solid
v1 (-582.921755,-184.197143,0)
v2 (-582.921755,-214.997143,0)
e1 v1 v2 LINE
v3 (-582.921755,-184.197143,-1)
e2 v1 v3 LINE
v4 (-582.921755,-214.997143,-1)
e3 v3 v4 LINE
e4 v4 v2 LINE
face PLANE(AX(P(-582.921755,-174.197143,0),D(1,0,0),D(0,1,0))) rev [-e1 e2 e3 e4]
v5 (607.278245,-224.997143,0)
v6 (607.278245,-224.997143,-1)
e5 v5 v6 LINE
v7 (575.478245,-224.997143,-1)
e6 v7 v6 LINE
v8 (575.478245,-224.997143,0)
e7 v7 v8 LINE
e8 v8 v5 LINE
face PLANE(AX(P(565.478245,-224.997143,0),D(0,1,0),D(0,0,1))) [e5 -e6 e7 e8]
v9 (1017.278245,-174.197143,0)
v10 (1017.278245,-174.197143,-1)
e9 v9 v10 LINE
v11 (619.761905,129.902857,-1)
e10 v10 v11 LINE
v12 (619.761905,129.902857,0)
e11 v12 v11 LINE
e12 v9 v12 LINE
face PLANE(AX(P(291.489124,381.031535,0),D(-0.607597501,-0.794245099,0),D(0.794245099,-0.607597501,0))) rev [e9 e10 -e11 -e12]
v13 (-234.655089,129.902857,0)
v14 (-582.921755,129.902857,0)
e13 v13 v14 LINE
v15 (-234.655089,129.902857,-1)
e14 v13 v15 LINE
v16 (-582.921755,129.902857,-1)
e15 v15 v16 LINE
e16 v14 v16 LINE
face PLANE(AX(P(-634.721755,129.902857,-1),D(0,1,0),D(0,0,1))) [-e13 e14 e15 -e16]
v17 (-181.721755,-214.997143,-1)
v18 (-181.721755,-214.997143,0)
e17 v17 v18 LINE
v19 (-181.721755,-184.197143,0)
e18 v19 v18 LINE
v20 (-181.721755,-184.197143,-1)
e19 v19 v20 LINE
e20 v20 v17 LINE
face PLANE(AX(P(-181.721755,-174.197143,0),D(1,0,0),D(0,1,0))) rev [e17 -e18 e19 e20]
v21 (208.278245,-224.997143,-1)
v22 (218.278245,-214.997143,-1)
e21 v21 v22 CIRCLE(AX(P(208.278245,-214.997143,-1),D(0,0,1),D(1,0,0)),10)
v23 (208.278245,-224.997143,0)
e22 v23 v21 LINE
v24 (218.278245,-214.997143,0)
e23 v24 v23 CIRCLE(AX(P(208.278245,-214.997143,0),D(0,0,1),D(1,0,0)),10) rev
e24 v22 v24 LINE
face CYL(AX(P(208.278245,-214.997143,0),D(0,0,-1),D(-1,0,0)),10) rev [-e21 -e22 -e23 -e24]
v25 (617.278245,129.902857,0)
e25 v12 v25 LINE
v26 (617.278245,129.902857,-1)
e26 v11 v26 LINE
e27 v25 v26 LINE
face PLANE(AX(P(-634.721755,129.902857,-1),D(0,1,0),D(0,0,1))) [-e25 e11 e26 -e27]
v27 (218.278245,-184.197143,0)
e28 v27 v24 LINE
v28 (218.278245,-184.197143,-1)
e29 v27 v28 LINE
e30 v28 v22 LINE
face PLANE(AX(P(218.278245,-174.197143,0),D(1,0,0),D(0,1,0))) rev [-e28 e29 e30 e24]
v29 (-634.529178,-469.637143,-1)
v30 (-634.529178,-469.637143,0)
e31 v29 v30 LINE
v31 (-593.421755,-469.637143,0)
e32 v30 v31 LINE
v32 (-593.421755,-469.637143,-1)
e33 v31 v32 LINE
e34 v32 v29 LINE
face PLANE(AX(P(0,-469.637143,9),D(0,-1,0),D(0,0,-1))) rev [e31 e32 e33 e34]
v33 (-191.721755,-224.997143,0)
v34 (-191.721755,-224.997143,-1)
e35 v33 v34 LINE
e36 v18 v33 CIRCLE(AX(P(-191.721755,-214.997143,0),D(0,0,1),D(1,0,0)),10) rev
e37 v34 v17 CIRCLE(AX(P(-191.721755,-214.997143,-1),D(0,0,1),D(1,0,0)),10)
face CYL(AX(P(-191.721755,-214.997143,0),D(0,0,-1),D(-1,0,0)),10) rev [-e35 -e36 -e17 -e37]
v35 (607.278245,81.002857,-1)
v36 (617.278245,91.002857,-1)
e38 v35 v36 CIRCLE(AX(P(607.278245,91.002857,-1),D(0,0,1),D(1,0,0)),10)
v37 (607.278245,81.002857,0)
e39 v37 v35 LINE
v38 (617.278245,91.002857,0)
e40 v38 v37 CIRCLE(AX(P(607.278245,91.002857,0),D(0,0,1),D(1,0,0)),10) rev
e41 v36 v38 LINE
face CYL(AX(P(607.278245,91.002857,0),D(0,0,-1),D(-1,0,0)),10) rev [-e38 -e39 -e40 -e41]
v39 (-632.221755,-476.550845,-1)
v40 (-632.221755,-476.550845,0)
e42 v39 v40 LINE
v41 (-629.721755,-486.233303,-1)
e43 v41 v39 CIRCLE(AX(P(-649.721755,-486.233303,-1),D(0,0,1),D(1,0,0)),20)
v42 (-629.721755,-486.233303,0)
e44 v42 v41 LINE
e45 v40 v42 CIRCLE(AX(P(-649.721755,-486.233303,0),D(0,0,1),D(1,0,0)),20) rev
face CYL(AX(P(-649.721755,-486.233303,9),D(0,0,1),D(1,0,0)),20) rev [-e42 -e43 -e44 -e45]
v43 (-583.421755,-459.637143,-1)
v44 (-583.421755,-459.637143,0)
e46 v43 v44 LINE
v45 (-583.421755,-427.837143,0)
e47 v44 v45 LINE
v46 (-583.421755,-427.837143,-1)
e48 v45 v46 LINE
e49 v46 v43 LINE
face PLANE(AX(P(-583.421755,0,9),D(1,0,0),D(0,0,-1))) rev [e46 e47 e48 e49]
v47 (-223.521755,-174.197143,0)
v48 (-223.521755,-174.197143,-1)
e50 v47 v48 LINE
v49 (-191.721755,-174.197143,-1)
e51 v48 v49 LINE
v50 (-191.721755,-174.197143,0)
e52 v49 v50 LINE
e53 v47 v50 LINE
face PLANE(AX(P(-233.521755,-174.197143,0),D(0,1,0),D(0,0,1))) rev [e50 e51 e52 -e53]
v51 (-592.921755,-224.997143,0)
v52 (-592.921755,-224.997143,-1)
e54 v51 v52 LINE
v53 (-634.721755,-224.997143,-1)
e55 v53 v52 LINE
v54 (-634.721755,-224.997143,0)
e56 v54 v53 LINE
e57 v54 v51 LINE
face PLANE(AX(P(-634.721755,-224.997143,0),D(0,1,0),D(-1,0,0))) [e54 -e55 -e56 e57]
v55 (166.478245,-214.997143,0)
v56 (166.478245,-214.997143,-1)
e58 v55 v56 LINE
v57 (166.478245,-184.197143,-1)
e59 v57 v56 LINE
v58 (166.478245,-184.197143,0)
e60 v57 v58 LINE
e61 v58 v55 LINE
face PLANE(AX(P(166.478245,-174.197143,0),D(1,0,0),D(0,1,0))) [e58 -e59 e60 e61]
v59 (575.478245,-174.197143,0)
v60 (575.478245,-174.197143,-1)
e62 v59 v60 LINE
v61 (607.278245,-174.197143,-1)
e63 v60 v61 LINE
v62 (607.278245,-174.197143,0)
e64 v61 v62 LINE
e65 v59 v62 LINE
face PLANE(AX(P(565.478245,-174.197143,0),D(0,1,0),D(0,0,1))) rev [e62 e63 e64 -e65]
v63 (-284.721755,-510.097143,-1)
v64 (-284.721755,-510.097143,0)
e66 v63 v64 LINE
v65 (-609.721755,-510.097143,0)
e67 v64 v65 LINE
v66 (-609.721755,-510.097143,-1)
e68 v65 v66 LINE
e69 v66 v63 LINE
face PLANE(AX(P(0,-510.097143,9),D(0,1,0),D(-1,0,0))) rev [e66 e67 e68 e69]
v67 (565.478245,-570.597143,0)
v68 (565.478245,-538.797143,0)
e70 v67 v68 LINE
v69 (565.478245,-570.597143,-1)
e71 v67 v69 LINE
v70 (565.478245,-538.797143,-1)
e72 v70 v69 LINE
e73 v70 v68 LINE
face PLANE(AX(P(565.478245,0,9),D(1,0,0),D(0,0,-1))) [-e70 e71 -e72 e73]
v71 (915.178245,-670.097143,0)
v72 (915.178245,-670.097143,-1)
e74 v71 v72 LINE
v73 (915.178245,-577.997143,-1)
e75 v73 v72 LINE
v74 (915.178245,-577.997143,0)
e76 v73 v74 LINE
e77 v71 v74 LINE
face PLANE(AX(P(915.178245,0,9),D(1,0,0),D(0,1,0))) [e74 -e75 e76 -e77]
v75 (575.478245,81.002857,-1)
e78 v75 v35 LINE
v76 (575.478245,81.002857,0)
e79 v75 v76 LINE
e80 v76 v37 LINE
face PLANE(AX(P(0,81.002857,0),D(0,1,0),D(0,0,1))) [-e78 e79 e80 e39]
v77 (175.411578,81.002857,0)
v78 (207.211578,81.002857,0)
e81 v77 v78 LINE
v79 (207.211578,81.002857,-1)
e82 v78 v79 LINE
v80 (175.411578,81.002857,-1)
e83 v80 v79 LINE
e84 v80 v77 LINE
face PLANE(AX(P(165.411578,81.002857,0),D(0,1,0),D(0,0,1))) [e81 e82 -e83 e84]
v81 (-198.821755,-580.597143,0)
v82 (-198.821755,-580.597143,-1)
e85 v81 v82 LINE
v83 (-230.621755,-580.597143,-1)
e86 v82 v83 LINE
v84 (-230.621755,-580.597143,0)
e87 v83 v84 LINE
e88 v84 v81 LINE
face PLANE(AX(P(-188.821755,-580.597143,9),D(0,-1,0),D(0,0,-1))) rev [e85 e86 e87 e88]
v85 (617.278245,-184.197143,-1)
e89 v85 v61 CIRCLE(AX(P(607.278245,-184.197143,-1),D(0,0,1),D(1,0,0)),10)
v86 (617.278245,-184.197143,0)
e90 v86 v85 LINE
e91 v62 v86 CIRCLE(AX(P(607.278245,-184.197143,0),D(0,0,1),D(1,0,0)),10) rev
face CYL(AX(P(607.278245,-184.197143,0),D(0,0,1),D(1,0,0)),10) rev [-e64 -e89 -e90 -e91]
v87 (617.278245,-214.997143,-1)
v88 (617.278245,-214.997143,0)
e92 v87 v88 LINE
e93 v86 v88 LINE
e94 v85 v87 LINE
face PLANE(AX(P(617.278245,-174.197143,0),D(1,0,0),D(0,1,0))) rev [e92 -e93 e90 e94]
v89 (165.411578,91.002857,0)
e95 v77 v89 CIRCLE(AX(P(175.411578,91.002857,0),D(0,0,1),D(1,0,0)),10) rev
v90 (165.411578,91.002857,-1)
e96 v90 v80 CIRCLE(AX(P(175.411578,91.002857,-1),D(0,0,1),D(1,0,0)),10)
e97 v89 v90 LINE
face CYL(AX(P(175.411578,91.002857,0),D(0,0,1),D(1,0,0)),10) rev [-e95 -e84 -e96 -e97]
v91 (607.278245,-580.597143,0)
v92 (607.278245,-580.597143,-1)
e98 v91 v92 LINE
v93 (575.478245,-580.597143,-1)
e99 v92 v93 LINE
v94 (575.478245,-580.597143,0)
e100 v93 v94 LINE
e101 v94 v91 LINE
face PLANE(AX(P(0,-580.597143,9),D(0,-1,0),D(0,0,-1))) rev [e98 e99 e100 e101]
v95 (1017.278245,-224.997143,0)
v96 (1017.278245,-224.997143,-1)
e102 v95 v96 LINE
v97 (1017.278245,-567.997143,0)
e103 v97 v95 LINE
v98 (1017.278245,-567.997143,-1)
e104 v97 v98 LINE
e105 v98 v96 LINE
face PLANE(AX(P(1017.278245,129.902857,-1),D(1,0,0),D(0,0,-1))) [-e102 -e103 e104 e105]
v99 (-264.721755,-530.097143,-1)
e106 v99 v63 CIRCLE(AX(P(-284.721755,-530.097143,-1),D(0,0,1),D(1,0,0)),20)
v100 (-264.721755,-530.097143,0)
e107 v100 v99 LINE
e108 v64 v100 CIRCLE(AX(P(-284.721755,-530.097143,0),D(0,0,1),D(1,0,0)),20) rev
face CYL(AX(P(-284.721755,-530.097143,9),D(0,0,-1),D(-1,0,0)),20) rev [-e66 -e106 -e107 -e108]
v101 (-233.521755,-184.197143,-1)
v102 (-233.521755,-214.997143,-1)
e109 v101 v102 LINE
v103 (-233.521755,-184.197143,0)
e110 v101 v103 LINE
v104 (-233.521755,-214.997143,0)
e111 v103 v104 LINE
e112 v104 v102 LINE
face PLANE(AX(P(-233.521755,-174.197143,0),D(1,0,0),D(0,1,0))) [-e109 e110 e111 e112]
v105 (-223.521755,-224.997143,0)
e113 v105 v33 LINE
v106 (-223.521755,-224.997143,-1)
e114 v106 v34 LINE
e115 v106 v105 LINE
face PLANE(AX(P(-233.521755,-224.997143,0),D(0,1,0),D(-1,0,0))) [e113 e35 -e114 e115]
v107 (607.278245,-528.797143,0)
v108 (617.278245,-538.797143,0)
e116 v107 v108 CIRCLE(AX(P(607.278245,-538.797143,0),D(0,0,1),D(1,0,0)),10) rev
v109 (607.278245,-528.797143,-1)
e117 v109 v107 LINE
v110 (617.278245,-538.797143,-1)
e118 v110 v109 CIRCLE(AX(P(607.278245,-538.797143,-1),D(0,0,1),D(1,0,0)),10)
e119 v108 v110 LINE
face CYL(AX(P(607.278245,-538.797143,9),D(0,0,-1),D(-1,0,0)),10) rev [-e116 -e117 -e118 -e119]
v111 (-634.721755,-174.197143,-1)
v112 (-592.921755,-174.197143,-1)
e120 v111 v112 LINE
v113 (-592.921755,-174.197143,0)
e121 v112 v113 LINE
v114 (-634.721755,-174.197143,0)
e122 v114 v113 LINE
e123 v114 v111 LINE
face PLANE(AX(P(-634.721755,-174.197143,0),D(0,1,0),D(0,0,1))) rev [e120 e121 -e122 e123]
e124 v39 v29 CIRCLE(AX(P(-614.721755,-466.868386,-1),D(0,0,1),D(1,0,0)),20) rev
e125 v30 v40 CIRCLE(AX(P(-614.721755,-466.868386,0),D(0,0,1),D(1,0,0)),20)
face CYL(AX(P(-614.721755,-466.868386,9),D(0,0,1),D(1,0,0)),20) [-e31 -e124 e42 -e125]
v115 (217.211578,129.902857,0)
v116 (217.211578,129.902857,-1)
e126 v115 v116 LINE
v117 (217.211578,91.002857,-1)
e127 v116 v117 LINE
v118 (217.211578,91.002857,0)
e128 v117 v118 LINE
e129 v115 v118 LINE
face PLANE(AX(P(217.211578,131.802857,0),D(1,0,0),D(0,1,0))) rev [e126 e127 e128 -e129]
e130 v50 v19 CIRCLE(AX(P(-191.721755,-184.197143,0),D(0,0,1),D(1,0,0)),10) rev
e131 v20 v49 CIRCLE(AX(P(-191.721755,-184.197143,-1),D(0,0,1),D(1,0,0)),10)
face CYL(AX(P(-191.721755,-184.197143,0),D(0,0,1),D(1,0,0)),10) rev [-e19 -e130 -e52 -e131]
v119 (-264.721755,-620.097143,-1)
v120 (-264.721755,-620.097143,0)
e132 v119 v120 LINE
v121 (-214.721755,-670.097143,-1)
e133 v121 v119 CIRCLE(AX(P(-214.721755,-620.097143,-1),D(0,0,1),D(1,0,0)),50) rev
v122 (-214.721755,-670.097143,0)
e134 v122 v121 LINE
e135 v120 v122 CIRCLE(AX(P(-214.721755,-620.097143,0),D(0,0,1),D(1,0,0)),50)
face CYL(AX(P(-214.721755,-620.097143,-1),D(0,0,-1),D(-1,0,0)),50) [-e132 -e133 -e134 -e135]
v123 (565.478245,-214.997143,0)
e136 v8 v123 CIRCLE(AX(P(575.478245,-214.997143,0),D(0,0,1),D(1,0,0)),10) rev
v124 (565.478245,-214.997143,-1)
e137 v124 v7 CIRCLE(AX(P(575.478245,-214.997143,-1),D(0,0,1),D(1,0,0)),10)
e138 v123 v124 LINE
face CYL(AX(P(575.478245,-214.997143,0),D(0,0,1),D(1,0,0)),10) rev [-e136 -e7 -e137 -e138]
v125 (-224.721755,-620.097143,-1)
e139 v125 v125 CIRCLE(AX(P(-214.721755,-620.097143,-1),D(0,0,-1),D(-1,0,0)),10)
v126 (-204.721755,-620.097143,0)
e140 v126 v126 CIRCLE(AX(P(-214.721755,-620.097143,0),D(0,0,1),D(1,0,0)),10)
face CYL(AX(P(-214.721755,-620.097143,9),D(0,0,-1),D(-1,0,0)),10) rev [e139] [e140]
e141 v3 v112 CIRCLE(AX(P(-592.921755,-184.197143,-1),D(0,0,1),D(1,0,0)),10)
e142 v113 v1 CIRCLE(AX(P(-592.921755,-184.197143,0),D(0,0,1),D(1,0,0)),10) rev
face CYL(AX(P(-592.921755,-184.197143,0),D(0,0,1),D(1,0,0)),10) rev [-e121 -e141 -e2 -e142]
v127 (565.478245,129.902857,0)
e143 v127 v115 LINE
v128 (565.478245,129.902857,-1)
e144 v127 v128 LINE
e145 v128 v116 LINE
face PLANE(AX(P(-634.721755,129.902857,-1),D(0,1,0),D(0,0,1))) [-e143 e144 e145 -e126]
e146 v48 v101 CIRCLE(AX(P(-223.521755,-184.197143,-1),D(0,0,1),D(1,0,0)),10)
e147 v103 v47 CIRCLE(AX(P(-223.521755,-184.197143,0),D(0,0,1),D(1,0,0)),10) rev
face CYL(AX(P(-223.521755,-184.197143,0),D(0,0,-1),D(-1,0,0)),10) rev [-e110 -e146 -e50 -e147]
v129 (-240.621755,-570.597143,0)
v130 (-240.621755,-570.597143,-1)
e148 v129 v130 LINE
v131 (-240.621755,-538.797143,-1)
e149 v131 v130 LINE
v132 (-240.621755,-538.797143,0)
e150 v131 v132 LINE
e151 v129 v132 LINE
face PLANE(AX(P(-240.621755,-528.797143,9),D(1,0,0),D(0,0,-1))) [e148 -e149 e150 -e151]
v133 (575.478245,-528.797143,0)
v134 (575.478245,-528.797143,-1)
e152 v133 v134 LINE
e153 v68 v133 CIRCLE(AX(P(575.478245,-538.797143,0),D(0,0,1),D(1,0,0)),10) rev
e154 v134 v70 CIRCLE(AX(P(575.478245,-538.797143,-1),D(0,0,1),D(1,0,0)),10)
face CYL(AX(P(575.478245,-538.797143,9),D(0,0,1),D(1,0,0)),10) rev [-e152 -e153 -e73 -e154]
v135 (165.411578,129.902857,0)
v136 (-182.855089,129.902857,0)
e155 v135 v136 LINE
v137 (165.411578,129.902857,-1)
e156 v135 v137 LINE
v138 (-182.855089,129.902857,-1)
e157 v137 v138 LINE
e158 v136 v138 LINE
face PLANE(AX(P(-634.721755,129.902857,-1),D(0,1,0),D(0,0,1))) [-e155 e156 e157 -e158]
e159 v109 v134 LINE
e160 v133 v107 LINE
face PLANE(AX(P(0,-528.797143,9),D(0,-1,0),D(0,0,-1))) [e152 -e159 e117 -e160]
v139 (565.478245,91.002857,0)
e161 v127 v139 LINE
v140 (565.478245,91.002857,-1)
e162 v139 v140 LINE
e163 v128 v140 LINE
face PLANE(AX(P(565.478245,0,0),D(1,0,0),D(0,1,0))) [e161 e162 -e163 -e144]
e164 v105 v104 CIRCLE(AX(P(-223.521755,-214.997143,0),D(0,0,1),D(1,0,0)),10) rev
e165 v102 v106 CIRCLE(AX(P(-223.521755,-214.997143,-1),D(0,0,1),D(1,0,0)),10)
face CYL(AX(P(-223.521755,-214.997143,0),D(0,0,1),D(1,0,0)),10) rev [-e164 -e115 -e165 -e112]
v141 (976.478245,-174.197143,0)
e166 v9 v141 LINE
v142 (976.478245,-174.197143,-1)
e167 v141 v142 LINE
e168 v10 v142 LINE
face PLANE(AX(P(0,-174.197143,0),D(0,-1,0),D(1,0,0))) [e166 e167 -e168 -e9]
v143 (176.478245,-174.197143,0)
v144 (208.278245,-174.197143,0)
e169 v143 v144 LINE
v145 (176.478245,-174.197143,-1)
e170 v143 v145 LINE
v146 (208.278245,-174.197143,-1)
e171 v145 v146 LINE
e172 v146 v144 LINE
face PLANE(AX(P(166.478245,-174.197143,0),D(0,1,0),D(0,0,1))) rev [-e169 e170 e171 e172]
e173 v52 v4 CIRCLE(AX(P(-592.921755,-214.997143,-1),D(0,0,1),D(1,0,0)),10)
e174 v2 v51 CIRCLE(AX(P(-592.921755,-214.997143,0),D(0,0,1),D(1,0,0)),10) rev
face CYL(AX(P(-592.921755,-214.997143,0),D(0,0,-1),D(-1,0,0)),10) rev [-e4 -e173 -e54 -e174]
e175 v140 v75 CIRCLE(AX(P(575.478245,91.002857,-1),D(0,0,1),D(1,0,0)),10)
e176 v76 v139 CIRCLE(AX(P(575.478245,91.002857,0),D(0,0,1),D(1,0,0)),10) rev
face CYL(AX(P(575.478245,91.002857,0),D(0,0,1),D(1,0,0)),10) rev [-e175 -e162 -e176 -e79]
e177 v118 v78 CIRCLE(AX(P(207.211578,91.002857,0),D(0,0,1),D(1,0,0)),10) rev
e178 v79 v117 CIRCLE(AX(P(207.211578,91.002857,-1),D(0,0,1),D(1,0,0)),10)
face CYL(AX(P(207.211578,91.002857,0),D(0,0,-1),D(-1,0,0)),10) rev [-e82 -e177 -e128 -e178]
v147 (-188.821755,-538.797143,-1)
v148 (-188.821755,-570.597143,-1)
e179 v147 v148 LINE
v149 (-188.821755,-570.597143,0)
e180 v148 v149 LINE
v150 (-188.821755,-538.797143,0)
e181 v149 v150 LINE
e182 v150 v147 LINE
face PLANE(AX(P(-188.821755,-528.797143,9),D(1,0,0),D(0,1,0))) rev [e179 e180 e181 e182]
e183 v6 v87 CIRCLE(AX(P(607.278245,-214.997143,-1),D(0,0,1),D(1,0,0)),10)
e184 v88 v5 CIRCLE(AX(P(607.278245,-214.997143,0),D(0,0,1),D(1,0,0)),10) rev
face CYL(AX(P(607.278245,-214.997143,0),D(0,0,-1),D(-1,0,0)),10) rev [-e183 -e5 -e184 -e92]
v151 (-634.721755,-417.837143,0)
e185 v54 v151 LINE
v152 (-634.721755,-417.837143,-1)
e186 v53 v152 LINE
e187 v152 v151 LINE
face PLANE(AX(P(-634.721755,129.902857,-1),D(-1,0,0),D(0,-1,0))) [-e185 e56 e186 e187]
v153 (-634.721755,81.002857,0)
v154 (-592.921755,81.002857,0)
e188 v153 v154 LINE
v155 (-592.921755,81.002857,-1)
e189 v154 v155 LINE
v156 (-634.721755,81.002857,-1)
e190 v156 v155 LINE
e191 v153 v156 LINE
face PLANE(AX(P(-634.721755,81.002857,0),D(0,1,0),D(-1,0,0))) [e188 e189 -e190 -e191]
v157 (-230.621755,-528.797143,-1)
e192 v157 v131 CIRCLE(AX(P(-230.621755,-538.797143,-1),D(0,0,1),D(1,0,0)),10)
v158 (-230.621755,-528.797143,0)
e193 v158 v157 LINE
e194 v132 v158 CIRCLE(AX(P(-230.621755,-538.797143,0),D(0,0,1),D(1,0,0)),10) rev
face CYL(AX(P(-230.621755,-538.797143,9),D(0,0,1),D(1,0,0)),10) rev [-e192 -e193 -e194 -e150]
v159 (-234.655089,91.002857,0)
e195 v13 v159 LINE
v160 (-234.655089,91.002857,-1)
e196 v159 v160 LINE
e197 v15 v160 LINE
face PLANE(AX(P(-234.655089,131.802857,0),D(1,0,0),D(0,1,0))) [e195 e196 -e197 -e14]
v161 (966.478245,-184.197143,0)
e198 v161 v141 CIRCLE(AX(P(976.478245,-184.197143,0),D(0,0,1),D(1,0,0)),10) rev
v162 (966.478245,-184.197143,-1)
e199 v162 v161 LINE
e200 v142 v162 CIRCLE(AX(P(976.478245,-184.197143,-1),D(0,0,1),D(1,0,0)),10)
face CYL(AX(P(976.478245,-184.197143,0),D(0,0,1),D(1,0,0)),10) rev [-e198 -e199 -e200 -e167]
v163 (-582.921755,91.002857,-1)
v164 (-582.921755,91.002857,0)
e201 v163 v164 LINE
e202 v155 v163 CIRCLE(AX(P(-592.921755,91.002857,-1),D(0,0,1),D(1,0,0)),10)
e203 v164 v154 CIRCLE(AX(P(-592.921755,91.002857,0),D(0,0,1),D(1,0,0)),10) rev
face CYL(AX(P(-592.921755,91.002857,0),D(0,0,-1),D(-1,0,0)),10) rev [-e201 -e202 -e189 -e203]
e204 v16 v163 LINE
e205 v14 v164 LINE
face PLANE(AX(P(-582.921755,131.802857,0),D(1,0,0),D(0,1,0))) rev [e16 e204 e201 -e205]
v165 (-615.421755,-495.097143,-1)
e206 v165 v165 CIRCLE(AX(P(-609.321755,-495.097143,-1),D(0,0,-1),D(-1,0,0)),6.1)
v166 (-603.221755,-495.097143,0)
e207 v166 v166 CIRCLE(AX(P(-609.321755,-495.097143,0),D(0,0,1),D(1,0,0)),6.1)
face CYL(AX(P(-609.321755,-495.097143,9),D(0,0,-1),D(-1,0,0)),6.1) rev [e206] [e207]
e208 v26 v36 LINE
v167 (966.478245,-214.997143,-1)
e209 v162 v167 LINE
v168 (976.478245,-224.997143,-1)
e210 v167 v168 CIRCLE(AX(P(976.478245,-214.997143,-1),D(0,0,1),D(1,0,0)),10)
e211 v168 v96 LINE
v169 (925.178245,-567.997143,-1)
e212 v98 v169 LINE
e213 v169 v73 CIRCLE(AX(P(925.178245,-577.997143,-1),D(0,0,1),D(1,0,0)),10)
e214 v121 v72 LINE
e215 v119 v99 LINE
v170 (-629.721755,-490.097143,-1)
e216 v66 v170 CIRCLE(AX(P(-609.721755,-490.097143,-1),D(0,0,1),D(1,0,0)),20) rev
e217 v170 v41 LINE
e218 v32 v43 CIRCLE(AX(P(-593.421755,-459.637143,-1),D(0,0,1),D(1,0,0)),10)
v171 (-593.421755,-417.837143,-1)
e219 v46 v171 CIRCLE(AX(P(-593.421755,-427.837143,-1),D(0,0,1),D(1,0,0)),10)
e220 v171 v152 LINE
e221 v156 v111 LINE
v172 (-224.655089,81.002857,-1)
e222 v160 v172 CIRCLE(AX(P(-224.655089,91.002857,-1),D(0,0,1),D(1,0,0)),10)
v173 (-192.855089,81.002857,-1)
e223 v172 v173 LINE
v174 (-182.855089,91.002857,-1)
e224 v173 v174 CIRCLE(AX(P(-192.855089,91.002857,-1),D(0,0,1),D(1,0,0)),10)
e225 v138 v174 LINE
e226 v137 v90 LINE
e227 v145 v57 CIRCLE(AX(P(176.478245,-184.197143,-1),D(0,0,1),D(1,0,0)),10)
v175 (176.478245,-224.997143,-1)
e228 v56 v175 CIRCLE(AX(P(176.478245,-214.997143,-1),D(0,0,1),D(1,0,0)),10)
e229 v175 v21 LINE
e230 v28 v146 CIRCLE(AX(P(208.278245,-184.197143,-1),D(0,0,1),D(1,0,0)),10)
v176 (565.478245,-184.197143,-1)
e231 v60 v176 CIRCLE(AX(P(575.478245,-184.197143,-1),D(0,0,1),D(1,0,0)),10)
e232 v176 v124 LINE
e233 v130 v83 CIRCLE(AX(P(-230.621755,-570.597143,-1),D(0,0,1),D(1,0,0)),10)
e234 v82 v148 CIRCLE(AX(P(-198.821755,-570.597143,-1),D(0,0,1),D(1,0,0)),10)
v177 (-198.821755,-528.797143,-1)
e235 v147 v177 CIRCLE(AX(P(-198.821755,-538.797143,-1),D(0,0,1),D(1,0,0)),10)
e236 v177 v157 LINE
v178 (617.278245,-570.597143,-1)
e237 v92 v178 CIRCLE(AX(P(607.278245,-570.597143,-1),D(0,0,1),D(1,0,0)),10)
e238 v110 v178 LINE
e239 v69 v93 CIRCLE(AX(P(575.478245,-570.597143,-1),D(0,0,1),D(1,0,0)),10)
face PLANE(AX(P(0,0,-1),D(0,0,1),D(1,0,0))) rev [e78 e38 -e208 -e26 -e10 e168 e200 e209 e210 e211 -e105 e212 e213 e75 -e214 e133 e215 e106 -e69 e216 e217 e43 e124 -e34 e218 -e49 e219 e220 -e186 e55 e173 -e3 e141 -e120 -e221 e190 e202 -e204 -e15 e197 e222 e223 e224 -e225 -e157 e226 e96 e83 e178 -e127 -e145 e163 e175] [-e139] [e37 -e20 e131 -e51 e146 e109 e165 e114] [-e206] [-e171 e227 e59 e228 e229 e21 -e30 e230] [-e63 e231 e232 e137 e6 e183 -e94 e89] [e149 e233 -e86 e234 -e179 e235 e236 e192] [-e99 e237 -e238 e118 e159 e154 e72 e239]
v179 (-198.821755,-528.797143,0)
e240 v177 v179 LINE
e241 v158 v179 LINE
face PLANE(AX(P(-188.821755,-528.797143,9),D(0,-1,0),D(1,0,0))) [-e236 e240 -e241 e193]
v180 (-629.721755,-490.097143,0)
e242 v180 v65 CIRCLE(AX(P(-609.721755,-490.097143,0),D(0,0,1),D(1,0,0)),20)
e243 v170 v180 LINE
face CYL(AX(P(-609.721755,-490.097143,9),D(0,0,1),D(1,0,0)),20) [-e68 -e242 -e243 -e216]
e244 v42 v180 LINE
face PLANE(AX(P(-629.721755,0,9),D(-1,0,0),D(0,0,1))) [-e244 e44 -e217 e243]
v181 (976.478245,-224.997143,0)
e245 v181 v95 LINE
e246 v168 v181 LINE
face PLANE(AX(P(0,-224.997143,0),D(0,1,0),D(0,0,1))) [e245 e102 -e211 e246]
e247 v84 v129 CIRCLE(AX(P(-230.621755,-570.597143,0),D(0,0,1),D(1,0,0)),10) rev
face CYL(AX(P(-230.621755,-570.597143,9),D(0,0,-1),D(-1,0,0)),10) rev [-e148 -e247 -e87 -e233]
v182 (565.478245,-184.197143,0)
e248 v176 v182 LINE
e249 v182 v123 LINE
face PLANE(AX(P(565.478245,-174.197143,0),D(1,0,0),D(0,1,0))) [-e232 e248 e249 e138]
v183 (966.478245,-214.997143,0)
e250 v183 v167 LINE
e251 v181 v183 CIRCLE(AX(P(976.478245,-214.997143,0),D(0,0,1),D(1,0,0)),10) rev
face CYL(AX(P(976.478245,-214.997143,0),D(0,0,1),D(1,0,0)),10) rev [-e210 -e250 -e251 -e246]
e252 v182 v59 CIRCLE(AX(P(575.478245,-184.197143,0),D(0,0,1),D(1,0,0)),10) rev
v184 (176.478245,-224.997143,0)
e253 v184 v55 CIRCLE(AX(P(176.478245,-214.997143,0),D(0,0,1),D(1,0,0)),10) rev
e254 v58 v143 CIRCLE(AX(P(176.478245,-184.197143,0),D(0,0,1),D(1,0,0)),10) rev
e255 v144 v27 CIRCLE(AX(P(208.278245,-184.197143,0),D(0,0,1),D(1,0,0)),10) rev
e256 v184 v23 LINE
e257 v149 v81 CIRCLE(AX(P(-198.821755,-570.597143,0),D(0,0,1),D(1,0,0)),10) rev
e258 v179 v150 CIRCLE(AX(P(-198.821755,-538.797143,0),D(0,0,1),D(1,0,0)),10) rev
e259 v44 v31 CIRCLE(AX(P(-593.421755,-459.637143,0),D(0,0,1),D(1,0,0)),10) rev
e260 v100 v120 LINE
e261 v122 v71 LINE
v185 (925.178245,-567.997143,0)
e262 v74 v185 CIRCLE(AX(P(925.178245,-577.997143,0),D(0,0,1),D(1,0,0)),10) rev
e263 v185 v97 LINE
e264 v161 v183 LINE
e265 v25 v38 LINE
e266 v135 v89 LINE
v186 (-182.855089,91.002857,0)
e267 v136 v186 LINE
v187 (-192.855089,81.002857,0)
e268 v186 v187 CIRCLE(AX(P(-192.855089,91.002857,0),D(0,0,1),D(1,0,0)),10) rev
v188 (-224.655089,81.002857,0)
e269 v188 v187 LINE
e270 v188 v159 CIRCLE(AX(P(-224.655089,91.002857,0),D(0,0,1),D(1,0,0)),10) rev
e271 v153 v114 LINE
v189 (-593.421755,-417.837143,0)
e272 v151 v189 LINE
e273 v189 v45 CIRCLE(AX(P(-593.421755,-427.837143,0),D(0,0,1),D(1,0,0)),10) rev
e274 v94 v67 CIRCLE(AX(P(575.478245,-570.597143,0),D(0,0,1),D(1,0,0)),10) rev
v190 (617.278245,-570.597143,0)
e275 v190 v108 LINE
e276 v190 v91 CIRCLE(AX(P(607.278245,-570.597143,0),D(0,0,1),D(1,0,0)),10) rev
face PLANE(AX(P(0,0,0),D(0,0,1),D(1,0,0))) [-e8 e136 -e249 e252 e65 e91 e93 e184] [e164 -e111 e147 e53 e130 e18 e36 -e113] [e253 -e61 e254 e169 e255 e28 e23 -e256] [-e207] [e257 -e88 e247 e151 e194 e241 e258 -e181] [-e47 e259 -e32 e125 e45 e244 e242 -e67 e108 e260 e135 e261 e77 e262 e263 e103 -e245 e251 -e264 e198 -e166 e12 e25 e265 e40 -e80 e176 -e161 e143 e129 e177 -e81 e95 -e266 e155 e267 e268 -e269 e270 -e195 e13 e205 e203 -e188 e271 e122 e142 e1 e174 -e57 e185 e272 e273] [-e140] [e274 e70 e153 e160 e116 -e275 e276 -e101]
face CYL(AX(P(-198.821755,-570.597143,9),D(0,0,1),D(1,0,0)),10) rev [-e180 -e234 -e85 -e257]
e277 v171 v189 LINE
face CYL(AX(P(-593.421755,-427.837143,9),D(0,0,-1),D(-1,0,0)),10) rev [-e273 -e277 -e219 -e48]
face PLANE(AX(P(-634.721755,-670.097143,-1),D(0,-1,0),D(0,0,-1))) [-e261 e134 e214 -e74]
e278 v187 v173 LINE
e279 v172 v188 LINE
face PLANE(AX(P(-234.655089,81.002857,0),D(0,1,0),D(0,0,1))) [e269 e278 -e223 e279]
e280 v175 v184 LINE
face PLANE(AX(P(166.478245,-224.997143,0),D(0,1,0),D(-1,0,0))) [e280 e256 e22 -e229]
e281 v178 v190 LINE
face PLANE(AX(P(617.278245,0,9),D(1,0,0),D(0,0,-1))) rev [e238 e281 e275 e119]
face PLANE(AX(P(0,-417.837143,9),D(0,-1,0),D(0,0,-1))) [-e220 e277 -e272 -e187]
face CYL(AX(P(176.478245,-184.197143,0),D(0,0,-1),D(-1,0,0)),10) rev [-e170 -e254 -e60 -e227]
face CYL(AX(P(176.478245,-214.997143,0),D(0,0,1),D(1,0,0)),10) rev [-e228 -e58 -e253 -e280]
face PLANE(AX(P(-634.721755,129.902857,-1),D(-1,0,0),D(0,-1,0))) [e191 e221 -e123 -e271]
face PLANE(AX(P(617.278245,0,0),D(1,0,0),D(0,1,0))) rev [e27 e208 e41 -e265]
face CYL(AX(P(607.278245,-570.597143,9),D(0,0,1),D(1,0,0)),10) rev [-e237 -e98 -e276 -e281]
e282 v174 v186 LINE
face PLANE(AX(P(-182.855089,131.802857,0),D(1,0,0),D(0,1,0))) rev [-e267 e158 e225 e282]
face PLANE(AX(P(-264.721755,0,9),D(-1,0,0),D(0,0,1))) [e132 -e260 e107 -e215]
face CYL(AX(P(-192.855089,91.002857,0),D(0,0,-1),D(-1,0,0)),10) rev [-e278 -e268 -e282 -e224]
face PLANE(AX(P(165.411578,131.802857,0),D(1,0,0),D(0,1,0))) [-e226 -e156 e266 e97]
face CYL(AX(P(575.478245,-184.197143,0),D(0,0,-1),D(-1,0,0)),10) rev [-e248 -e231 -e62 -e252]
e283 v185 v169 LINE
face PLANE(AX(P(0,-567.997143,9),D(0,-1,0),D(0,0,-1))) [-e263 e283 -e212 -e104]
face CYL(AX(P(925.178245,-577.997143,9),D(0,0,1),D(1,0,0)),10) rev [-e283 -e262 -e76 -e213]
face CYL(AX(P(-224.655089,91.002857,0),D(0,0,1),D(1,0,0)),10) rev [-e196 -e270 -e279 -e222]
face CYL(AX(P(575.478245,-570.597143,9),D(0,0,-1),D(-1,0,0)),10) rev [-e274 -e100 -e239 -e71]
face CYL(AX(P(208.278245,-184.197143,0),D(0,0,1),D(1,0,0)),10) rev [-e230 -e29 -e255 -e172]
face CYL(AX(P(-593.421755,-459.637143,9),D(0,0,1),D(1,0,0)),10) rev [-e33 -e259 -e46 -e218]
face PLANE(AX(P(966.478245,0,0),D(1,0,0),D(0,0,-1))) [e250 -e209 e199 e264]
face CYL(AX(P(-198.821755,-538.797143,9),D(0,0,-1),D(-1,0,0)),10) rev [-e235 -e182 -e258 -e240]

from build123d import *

# Parameters (mm, degrees)
CROQUIS1_W            = 1652
CROQUIS1_H            = 800
BRIDA_BASE1_DEPTH     = 1
CROQUIS14_W           = 51.8
CROQUIS14_H           = 50.8
CROQUIS14_W_2         = 50.8
CORTAR_EXTRUIR1_DEPTH = 1219.148680595
REDONDEO1_R           = 10
REDONDEO2_R           = 10
CROQUIS17_W           = 370
CROQUIS17_H           = 160
CROQUIS17_W_2         = 5
CROQUIS17_H_2         = 30
CROQUIS17_R           = 6.1
CORTAR_EXTRUIR2_DEPTH = 10
REDONDEO3_R           = 50
REDONDEO4_R           = 20
CROQUIS18_R           = 10
CROQUIS18_W           = 51.8
CROQUIS18_H           = 51.8
CROQUIS18_W_2         = 102.1
CROQUIS18_H_2         = 102.1
CORTAR_EXTRUIR3_DEPTH = 10
REDONDEO5_R           = 10
REDONDEO6_R           = 20
REDONDEO7_R           = 10


# Sheet-metal steps are written as plain solids
with BuildPart() as part:
    # Brida base1: sheet metal written as solids
    # Croquis1 → Brida base1 (new body)
    with BuildSketch(Plane.XY):
        with Locations((191.278244715, -270.097142857)):
            Rectangle(CROQUIS1_W, CROQUIS1_H)
    extrude(amount=-BRIDA_BASE1_DEPTH)

    # Croquis14 → Cortar-Extruir1 (cut, through all)
    with BuildSketch(Plane.XY.offset(-1)):
        with Locations((-608.821755285, -199.597142857)):
            Rectangle(CROQUIS14_W, CROQUIS14_H)
        with Locations((991.878244715, -199.597142857)):
            Rectangle(CROQUIS14_W_2, CROQUIS14_H)
        with Locations((591.378244715, -199.597142857)):
            Rectangle(CROQUIS14_W, CROQUIS14_H)
        Polygon((617.278244715, 81.002857143), (617.278244715, 131.802857143), (565.478244715, 131.802857143), (565.478244715, 81.002857143), (591.378244715, 81.002857143), align=None)
        Polygon((617.278244715, 131.802857143), (1017.278244715, -174.197142857), (1017.278244715, 131.802857143), align=None)
        with Locations((-207.621755285, -199.597142857)):
            Rectangle(CROQUIS14_W, CROQUIS14_H)
        with Locations((192.378244715, -199.597142857)):
            Rectangle(CROQUIS14_W, CROQUIS14_H)
        with Locations((191.311578048, 106.402857143)):
            Rectangle(CROQUIS14_W, CROQUIS14_H)
        with Locations((-208.755088618, 106.402857143)):
            Rectangle(CROQUIS14_W, CROQUIS14_H)
        with Locations((-608.821755285, 106.402857143)):
            Rectangle(CROQUIS14_W, CROQUIS14_H)
    extrude(amount=CORTAR_EXTRUIR1_DEPTH, mode=Mode.SUBTRACT)

    # Redondeo1
    redondeo1_edges = [part.edges().sort_by_distance(p)[0] for p in [
        (617.278244715, -224.997142857, -0.5),
    ]]
    fillet(redondeo1_edges, radius=REDONDEO1_R)

    # Redondeo2
    redondeo2_edges = [part.edges().sort_by_distance(p)[0] for p in [
        (-582.921755285, -174.197142857, -0.5),
        (-582.921755285, -224.997142857, -0.5),
        (-181.721755285, -174.197142857, -0.5),
        (-233.521755285, -174.197142857, -0.5),
        (-233.521755285, -224.997142857, -0.5),
        (-181.721755285, -224.997142857, -0.5),
        (166.478244715, -174.197142857, -0.5),
        (166.478244715, -224.997142857, -0.5),
        (218.278244715, -224.997142857, -0.5),
        (218.278244715, -174.197142857, -0.5),
        (617.278244715, -174.197142857, -0.5),
        (565.478244715, -174.197142857, -0.5),
        (565.478244715, -224.997142857, -0.5),
        (966.478244715, -224.997142857, -0.5),
        (966.478244715, -174.197142857, -0.5),
        (565.478244715, 81.002857143, -0.5),
        (617.278244715, 81.002857143, -0.5),
        (-582.921755285, 81.002857143, -0.5),
        (-234.655088618, 81.002857143, -0.5),
        (-182.855088618, 81.002857143, -0.5),
        (165.411578048, 81.002857143, -0.5),
        (217.211578048, 81.002857143, -0.5),
    ]]
    fillet(redondeo2_edges, radius=REDONDEO2_R)

    # Croquis17 → Cortar-Extruir2 (cut)
    with BuildSketch(Plane(origin=(0, 0, -1), x_dir=(-1, 0, 0), z_dir=(0, 0, -1))):
        with Locations((449.721755285, -590.097142857)):
            Rectangle(CROQUIS17_W, CROQUIS17_H)
        with Locations((632.221755285, -495.097142857)):
            Rectangle(CROQUIS17_W_2, CROQUIS17_H_2)
        with Locations((609.321755285, -495.097142857)):
            Circle(CROQUIS17_R)
    extrude(amount=-CORTAR_EXTRUIR2_DEPTH, mode=Mode.SUBTRACT)

    # Redondeo3
    redondeo3_edges = [part.edges().sort_by_distance(p)[0] for p in [
        (-264.721755285, -670.097142857, -0.5),
        (1017.278244715, -670.097142857, -0.5),
    ]]
    fillet(redondeo3_edges, radius=REDONDEO3_R)

    # Redondeo4
    # the kernel refuses this fillet: 20 mm, written as the material it adds along each edge
    with BuildSketch(Plane(origin=(-264.721755285, -510.097142857, -1), x_dir=(0, -1, 0), z_dir=(0, 0, 1))) as redondeo4_piece_1:
        with BuildLine():
            CenterArc((REDONDEO4_R, -REDONDEO4_R), REDONDEO4_R, 90, 90)
            Line((0, -REDONDEO4_R), (0, 0))
            Line((0, 0), (REDONDEO4_R, 0))
        make_face()
    extrude(amount=1)
    # the kernel refuses this fillet: 20 mm, written as the material it takes off along each edge
    with BuildSketch(Plane(origin=(-629.721755285, -510.097142857, -51), x_dir=(1, 0, 0), z_dir=(0, 0, 1))) as redondeo4_2_piece_1:
        with BuildLine():
            CenterArc((REDONDEO4_R, REDONDEO4_R), REDONDEO4_R, 180, 90)
            Line((0, REDONDEO4_R), (0, 0))
            Line((0, 0), (REDONDEO4_R, 0))
        make_face()
    extrude(amount=101, mode=Mode.SUBTRACT)
    with BuildSketch(Plane(origin=(-634.721755285, -480.097142857, -34.071891388), x_dir=(1, 0, 0), z_dir=(0, 0, 1))) as redondeo4_2_piece_2:
        with BuildLine():
            CenterArc((20, 13.228756555), REDONDEO4_R, 180, 41.409622109)
            Line((0, 13.228756555), (0, 0))
            Line((0, 0), (5, 0))
        make_face()
    extrude(amount=67.143782777, mode=Mode.SUBTRACT)

    # Croquis18 → Cortar-Extruir3 (cut)
    with BuildSketch(Plane(origin=(0, 0, -1), x_dir=(-1, 0, 0), z_dir=(0, 0, -1))):
        with Locations((214.721755285, -620.097142857)):
            Circle(CROQUIS18_R)
        with Locations((609.321755285, -443.737142857)):
            Rectangle(CROQUIS18_W, CROQUIS18_H)
        with Locations((-591.378244715, -554.697142857)):
            Rectangle(CROQUIS18_W, CROQUIS18_H)
        with Locations((-966.228244715, -619.047142857)):
            Rectangle(CROQUIS18_W_2, CROQUIS18_H_2)
        with Locations((214.721755285, -554.697142857)):
            Rectangle(CROQUIS18_W, CROQUIS18_H)
    extrude(amount=-CORTAR_EXTRUIR3_DEPTH, mode=Mode.SUBTRACT)

    # Redondeo5
    redondeo5_edges = [part.edges().sort_by_distance(p)[0] for p in [
        (565.478244715, -528.797142857, -0.5),
        (565.478244715, -580.597142857, -0.5),
        (617.278244715, -580.597142857, -0.5),
        (617.278244715, -528.797142857, -0.5),
        (915.178244715, -567.997142857, -0.5),
        (-188.821755285, -528.797142857, -0.5),
        (-240.621755285, -528.797142857, -0.5),
        (-240.621755285, -580.597142857, -0.5),
        (-188.821755285, -580.597142857, -0.5),
    ]]
    fillet(redondeo5_edges, radius=REDONDEO5_R)

    # Redondeo6
    redondeo6_edges = [part.edges().sort_by_distance(p)[0] for p in [
        (-629.721755285, -480.097142857, -0.5),
    ]]
    fillet(redondeo6_edges, radius=REDONDEO6_R)

    # Redondeo7
    redondeo7_edges = [part.edges().sort_by_distance(p)[0] for p in [
        (-583.421755285, -469.637142857, -0.5),
        (-583.421755285, -417.837142857, -0.5),
    ]]
    fillet(redondeo7_edges, radius=REDONDEO7_R)


solid = part.part
